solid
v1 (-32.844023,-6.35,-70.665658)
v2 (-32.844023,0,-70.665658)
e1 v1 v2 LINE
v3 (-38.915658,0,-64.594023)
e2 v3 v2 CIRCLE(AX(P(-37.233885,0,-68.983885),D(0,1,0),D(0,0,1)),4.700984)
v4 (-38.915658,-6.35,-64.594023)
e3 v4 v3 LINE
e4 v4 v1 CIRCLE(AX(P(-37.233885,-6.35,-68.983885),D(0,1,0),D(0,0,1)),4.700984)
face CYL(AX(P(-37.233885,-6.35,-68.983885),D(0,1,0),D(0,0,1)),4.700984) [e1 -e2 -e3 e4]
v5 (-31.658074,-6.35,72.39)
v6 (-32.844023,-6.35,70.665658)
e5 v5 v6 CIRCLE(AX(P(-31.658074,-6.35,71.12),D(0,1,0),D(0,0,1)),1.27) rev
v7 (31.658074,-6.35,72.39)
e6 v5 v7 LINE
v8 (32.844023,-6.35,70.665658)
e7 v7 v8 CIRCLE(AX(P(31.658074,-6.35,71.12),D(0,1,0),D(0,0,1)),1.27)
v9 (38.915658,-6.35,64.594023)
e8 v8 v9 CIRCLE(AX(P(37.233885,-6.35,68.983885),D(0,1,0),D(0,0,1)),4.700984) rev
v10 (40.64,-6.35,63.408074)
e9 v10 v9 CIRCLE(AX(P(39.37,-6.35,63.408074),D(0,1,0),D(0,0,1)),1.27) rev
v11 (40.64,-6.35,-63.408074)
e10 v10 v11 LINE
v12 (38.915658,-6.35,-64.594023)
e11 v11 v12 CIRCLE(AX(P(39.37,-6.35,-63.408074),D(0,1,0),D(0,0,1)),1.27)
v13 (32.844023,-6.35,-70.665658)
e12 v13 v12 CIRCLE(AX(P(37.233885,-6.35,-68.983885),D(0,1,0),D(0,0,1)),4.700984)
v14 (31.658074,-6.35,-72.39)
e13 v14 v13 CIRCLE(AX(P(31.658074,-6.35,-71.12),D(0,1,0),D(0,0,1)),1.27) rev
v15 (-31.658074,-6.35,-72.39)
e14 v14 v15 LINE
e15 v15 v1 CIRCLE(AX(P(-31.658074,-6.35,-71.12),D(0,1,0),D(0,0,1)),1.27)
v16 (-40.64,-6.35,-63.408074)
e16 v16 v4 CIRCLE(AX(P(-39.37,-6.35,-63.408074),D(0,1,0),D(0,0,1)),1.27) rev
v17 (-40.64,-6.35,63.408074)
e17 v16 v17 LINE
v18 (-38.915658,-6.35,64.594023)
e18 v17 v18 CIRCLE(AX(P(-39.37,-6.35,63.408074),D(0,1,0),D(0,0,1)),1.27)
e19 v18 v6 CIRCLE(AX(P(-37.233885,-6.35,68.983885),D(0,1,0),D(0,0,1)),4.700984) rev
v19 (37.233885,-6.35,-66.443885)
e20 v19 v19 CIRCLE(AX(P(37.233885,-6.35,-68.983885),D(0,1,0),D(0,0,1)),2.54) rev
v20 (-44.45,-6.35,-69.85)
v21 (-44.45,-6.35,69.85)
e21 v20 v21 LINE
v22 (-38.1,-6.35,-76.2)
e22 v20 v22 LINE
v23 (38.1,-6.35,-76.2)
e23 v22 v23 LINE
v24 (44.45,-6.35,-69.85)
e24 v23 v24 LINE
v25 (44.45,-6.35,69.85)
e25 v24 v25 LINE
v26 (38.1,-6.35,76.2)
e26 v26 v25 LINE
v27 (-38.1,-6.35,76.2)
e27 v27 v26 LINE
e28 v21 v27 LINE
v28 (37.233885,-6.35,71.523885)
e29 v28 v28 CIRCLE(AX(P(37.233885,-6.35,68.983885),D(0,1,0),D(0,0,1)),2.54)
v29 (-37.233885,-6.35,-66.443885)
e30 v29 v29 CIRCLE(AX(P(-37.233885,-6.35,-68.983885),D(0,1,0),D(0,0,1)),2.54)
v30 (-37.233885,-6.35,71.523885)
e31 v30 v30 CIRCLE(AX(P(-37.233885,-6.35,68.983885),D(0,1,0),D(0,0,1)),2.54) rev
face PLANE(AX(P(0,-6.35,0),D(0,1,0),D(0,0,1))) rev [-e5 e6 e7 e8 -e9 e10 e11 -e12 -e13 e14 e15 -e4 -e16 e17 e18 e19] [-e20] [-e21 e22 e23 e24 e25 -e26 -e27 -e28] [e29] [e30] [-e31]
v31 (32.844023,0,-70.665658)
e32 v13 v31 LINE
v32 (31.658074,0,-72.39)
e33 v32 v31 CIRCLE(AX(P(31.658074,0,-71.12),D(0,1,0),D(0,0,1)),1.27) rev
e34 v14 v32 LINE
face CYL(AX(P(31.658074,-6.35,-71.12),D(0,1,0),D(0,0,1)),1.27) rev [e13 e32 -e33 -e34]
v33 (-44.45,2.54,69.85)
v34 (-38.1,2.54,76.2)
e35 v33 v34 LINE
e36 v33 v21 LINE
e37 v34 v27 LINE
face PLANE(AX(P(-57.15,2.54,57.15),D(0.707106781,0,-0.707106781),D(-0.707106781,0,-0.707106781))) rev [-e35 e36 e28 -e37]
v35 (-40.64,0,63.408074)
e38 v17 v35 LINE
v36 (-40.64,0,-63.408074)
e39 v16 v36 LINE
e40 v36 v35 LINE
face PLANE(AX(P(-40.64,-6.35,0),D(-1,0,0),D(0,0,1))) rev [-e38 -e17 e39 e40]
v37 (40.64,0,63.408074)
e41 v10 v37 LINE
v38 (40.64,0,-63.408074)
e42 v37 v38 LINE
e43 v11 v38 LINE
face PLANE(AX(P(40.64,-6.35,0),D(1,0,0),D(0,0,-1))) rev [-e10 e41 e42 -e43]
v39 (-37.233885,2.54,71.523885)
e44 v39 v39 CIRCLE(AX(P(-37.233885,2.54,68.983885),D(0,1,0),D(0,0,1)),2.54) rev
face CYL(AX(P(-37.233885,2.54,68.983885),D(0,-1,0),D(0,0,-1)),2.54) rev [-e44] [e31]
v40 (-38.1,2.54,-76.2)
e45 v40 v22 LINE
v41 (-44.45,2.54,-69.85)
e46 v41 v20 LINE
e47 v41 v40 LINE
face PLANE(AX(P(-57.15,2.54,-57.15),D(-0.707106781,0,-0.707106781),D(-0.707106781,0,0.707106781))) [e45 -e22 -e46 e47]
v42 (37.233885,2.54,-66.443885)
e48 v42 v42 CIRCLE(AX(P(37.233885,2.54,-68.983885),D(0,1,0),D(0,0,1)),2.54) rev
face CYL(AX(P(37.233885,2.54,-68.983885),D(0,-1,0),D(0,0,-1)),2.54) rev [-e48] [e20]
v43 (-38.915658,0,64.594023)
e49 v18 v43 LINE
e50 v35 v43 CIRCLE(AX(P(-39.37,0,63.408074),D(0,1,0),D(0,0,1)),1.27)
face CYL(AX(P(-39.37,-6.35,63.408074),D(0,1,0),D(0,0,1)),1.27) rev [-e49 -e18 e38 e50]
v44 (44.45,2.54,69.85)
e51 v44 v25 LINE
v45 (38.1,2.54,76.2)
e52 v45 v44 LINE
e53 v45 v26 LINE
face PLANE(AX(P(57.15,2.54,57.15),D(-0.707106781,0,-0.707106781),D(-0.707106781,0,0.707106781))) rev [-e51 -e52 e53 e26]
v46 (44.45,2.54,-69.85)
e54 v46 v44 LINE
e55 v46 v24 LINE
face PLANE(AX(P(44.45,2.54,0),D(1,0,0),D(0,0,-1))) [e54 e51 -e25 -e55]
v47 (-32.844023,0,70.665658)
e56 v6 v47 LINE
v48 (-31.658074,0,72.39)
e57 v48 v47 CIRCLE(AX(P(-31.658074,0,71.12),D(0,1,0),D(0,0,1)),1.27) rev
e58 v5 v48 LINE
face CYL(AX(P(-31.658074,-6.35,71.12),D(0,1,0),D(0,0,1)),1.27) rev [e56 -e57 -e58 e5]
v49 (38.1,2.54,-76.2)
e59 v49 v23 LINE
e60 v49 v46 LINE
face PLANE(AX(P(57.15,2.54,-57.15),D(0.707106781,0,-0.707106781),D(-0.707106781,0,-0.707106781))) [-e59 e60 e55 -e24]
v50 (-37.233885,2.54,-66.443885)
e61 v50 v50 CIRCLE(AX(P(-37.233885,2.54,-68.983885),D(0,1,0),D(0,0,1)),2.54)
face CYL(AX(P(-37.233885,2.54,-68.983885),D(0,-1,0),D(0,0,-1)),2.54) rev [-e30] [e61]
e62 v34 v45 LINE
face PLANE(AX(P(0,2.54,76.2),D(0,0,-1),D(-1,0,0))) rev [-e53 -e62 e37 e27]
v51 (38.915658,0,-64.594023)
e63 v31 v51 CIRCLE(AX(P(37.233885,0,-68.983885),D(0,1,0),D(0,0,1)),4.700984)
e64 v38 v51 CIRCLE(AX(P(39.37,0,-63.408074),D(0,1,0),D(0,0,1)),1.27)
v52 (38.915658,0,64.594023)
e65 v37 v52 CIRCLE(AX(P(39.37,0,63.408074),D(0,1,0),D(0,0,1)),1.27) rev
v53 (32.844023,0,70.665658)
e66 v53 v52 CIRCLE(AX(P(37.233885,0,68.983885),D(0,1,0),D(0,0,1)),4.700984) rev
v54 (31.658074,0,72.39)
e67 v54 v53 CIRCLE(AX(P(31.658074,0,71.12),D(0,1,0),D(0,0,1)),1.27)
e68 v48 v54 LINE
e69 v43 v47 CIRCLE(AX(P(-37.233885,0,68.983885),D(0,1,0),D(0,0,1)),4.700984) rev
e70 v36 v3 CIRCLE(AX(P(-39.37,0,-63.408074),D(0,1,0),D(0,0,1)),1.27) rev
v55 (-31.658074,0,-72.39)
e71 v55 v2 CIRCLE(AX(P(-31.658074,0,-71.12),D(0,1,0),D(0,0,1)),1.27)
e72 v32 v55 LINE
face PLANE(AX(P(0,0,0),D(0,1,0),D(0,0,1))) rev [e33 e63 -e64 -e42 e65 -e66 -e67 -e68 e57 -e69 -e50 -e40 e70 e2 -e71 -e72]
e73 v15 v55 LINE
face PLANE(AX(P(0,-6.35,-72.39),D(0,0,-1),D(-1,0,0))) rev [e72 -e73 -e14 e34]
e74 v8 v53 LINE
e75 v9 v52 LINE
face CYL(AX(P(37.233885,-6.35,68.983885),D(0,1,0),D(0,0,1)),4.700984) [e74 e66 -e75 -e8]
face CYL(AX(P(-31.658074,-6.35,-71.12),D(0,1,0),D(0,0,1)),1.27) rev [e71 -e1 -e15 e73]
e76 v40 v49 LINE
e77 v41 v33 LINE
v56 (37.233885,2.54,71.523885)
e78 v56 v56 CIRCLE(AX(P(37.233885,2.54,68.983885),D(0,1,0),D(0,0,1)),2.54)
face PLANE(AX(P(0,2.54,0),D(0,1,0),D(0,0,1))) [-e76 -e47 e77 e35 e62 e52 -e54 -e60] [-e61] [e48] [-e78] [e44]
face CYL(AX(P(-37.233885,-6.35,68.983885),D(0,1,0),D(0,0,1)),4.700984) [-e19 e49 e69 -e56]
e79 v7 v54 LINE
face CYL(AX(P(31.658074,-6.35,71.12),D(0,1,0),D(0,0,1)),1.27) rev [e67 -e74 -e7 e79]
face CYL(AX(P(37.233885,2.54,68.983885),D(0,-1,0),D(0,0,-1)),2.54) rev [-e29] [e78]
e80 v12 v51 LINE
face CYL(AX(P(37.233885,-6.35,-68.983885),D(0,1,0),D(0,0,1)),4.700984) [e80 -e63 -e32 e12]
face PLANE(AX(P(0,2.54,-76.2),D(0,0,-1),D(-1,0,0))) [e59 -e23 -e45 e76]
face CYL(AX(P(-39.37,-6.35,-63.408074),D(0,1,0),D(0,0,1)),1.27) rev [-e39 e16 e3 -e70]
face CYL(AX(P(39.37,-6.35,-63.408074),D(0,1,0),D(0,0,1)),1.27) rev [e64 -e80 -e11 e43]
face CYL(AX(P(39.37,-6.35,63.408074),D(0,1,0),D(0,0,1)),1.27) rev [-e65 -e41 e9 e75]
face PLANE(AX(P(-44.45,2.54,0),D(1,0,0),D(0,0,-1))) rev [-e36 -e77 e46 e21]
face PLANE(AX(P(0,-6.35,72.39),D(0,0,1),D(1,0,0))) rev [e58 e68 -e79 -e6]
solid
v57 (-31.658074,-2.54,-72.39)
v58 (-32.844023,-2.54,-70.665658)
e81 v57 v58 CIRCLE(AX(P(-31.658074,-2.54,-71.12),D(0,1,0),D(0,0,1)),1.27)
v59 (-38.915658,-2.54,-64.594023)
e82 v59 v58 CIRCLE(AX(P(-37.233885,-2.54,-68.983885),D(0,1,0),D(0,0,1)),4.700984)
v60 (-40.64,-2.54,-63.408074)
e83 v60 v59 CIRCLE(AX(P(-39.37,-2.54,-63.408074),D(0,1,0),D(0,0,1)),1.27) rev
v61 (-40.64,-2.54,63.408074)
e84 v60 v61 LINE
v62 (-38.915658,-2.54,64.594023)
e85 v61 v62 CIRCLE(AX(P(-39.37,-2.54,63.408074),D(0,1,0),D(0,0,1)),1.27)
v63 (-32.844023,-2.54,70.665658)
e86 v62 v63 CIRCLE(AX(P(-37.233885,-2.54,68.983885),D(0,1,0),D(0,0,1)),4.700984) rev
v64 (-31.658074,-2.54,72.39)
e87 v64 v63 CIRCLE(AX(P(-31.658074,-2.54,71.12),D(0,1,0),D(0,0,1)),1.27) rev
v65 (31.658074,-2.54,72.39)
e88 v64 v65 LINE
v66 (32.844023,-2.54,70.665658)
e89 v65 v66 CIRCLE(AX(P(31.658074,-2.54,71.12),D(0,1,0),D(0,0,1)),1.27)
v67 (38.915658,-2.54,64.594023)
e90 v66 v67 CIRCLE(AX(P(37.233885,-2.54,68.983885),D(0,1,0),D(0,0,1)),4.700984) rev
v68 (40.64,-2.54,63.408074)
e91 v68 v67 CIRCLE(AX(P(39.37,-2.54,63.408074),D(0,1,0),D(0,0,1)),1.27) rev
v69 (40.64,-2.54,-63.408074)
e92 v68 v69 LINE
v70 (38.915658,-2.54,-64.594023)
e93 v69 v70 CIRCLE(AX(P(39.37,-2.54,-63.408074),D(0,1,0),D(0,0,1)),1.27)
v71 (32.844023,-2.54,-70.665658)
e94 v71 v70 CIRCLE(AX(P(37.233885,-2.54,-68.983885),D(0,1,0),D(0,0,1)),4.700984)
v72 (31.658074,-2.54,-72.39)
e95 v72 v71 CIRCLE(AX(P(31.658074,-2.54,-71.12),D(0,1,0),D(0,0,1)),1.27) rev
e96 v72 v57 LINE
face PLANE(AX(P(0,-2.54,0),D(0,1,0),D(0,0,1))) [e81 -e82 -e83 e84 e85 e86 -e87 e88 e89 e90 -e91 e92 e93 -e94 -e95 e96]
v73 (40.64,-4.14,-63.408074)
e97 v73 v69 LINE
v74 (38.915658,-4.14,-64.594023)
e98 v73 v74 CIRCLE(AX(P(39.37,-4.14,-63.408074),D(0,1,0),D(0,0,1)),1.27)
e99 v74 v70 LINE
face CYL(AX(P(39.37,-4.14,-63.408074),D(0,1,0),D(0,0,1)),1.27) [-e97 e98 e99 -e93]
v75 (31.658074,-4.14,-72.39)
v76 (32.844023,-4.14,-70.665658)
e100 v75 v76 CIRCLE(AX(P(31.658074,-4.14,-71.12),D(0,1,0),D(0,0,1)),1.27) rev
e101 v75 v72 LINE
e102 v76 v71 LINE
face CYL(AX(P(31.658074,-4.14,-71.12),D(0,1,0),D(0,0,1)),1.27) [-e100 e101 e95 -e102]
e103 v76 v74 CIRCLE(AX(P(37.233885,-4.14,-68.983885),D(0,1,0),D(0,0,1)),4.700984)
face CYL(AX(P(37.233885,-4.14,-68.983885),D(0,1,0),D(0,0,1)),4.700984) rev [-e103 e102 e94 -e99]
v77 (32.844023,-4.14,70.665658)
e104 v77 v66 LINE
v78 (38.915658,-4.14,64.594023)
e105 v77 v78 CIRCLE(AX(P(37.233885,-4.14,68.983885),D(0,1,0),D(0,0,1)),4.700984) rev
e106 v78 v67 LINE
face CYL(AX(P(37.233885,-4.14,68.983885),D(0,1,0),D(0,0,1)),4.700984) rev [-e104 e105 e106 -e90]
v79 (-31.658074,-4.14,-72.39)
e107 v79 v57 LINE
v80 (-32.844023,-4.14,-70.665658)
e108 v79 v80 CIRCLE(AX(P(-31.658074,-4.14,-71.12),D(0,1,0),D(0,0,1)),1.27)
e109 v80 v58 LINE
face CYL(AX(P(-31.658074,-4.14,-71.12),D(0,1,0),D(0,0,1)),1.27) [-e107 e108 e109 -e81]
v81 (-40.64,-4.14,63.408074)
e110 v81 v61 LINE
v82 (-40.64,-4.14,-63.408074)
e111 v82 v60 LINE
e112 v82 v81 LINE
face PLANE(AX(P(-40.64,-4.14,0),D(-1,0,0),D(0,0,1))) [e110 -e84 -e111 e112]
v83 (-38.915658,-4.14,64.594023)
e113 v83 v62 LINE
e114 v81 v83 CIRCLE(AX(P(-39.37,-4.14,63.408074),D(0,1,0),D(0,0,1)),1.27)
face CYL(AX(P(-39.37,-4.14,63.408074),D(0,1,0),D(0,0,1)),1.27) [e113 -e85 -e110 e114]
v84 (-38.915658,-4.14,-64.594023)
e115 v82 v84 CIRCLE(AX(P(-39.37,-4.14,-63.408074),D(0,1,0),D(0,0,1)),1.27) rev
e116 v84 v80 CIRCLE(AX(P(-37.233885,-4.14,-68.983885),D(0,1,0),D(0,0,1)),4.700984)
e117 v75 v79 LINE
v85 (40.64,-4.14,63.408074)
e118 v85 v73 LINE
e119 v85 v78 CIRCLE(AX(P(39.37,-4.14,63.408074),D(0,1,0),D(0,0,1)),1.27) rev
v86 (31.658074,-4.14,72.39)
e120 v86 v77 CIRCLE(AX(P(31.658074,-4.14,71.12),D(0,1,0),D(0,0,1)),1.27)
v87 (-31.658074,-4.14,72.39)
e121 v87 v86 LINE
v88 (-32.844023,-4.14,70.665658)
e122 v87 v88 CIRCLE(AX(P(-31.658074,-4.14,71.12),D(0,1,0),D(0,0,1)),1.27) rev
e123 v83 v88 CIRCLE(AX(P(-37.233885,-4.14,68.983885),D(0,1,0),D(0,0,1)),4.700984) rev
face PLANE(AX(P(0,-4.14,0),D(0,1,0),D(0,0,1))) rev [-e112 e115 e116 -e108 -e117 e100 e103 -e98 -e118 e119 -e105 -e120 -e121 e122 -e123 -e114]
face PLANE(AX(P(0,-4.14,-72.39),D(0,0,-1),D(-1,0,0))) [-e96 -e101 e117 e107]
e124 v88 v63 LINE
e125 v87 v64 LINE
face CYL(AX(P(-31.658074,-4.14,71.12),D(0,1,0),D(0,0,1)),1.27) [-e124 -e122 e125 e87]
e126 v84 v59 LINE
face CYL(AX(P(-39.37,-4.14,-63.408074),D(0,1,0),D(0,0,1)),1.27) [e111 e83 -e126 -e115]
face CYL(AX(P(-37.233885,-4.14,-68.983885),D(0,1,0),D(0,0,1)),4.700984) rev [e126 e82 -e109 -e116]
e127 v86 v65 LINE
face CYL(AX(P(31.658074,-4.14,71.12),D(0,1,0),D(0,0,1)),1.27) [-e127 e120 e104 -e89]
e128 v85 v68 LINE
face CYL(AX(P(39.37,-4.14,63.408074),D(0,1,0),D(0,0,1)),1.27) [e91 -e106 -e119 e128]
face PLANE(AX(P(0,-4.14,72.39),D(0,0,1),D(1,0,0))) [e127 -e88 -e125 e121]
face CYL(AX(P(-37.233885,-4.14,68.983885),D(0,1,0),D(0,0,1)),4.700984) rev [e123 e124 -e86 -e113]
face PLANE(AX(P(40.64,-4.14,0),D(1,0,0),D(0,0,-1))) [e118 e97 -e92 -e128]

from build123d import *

# Parameters (mm, degrees)
SKETCH2_R           = 2.54
BOSS_EXTRUDE1_DEPTH = 2.54
BOSS_EXTRUDE2_START = -6.35
SKETCH2_3_R         = 2.54
BOSS_EXTRUDE2_DEPTH = 6.35
BOSS_EXTRUDE3_START = -2.54
BOSS_EXTRUDE3_DEPTH = 1.6


with BuildPart() as part:
    # Sketch2 → Boss-Extrude1 (new body)
    with BuildSketch(Plane(origin=(0, 0, 0), x_dir=(1, 0, 0), z_dir=(0, 1, 0))):
        Polygon((-44.45, 69.85), (-38.1, 76.2), (38.1, 76.2), (44.45, 69.85), (44.45, -69.85), (38.1, -76.2), (-38.1, -76.2), (-44.45, -69.85), align=None)
        with Locations(Location((-37.233884746, 68.983884746, 0), (0, 0, 270))):
            Circle(SKETCH2_R, mode=Mode.SUBTRACT)
        with Locations(Location((37.233884746, 68.983884746, 0), (0, 0, 270))):
            Circle(SKETCH2_R, mode=Mode.SUBTRACT)
        with Locations(Location((37.233884746, -68.983884746, 0), (0, 0, 270))):
            Circle(SKETCH2_R, mode=Mode.SUBTRACT)
        with Locations(Location((-37.233884746, -68.983884746, 0), (0, 0, 270))):
            Circle(SKETCH2_R, mode=Mode.SUBTRACT)
    extrude(amount=BOSS_EXTRUDE1_DEPTH)

    # Sketch2<3> → Boss-Extrude2 (add)
    with BuildSketch(Plane(origin=(0, 0, 0), x_dir=(1, 0, 0), z_dir=(0, 1, 0)).offset(BOSS_EXTRUDE2_START)):
        Polygon((-38.1, 76.2), (-44.45, 69.85), (-44.45, -69.85), (-38.1, -76.2), (38.1, -76.2), (44.45, -69.85), (44.45, 69.85), (38.1, 76.2), align=None)
        with BuildLine():
            Line((40.64, 63.408074469), (40.64, -63.408074469))
            ThreePointArc((40.64, -63.408074469), (40.089682627, -64.454476359), (38.9156584, -64.594022912))
            ThreePointArc((38.9156584, -64.594022912), (33.909787158, -65.659787158), (32.844022912, -70.6656584))
            ThreePointArc((32.844022912, -70.6656584), (32.704476359, -71.839682627), (31.658074469, -72.39))
            Line((31.658074469, -72.39), (-31.658074469, -72.39))
            ThreePointArc((-31.658074469, -72.39), (-32.704476359, -71.839682627), (-32.844022912, -70.6656584))
            ThreePointArc((-32.844022912, -70.6656584), (-33.909787158, -65.659787158), (-38.9156584, -64.594022912))
            ThreePointArc((-38.9156584, -64.594022912), (-40.089682627, -64.454476359), (-40.64, -63.408074469))
            Line((-40.64, -63.408074469), (-40.64, 63.408074469))
            ThreePointArc((-40.64, 63.408074469), (-40.089682627, 64.454476359), (-38.9156584, 64.594022912))
            ThreePointArc((-38.9156584, 64.594022912), (-33.909787158, 65.659787158), (-32.844022912, 70.6656584))
            ThreePointArc((-32.844022912, 70.6656584), (-32.704476359, 71.839682627), (-31.658074469, 72.39))
            Line((-31.658074469, 72.39), (31.658074469, 72.39))
            ThreePointArc((31.658074469, 72.39), (32.704476359, 71.839682627), (32.844022912, 70.6656584))
            ThreePointArc((32.844022912, 70.6656584), (33.909787158, 65.659787158), (38.9156584, 64.594022912))
            ThreePointArc((38.9156584, 64.594022912), (40.089682627, 64.454476359), (40.64, 63.408074469))
        make_face(mode=Mode.SUBTRACT)
        with Locations(Location((-37.233884746, 68.983884746, 0), (0, 0, 270))):
            Circle(SKETCH2_3_R, mode=Mode.SUBTRACT)
        with Locations(Location((37.233884746, 68.983884746, 0), (0, 0, 270))):
            Circle(SKETCH2_3_R, mode=Mode.SUBTRACT)
        with Locations(Location((-37.233884746, -68.983884746, 0), (0, 0, 270))):
            Circle(SKETCH2_3_R, mode=Mode.SUBTRACT)
        with Locations(Location((37.233884746, -68.983884746, 0), (0, 0, 270))):
            Circle(SKETCH2_3_R, mode=Mode.SUBTRACT)
    extrude(amount=BOSS_EXTRUDE2_DEPTH)


with BuildPart() as body_2:
    # Sketch2<4> → Boss-Extrude3 (new body)
    with BuildSketch(Plane(origin=(0, 0, 0), x_dir=(1, 0, 0), z_dir=(0, 1, 0)).offset(BOSS_EXTRUDE3_START)):
        with BuildLine():
            ThreePointArc((-40.64, 63.408074469), (-40.089682627, 64.454476359), (-38.9156584, 64.594022912))
            ThreePointArc((-38.9156584, 64.594022912), (-33.909787158, 65.659787158), (-32.844022912, 70.6656584))
            ThreePointArc((-32.844022912, 70.6656584), (-32.704476359, 71.839682627), (-31.658074469, 72.39))
            Line((-31.658074469, 72.39), (31.658074469, 72.39))
            ThreePointArc((31.658074469, 72.39), (32.704476359, 71.839682627), (32.844022912, 70.6656584))
            ThreePointArc((32.844022912, 70.6656584), (33.909787158, 65.659787158), (38.9156584, 64.594022912))
            ThreePointArc((38.9156584, 64.594022912), (40.089682627, 64.454476359), (40.64, 63.408074469))
            Line((40.64, 63.408074469), (40.64, -63.408074469))
            ThreePointArc((40.64, -63.408074469), (40.089682627, -64.454476359), (38.9156584, -64.594022912))
            ThreePointArc((38.9156584, -64.594022912), (33.909787158, -65.659787158), (32.844022912, -70.6656584))
            ThreePointArc((32.844022912, -70.6656584), (32.704476359, -71.839682627), (31.658074469, -72.39))
            Line((31.658074469, -72.39), (-31.658074469, -72.39))
            ThreePointArc((-31.658074469, -72.39), (-32.704476359, -71.839682627), (-32.844022912, -70.6656584))
            ThreePointArc((-32.844022912, -70.6656584), (-33.909787158, -65.659787158), (-38.9156584, -64.594022912))
            ThreePointArc((-38.9156584, -64.594022912), (-40.089682627, -64.454476359), (-40.64, -63.408074469))
            Line((-40.64, -63.408074469), (-40.64, 63.408074469))
        make_face()
    extrude(amount=-BOSS_EXTRUDE3_DEPTH)


solid = Compound([part.part, body_2.part])
